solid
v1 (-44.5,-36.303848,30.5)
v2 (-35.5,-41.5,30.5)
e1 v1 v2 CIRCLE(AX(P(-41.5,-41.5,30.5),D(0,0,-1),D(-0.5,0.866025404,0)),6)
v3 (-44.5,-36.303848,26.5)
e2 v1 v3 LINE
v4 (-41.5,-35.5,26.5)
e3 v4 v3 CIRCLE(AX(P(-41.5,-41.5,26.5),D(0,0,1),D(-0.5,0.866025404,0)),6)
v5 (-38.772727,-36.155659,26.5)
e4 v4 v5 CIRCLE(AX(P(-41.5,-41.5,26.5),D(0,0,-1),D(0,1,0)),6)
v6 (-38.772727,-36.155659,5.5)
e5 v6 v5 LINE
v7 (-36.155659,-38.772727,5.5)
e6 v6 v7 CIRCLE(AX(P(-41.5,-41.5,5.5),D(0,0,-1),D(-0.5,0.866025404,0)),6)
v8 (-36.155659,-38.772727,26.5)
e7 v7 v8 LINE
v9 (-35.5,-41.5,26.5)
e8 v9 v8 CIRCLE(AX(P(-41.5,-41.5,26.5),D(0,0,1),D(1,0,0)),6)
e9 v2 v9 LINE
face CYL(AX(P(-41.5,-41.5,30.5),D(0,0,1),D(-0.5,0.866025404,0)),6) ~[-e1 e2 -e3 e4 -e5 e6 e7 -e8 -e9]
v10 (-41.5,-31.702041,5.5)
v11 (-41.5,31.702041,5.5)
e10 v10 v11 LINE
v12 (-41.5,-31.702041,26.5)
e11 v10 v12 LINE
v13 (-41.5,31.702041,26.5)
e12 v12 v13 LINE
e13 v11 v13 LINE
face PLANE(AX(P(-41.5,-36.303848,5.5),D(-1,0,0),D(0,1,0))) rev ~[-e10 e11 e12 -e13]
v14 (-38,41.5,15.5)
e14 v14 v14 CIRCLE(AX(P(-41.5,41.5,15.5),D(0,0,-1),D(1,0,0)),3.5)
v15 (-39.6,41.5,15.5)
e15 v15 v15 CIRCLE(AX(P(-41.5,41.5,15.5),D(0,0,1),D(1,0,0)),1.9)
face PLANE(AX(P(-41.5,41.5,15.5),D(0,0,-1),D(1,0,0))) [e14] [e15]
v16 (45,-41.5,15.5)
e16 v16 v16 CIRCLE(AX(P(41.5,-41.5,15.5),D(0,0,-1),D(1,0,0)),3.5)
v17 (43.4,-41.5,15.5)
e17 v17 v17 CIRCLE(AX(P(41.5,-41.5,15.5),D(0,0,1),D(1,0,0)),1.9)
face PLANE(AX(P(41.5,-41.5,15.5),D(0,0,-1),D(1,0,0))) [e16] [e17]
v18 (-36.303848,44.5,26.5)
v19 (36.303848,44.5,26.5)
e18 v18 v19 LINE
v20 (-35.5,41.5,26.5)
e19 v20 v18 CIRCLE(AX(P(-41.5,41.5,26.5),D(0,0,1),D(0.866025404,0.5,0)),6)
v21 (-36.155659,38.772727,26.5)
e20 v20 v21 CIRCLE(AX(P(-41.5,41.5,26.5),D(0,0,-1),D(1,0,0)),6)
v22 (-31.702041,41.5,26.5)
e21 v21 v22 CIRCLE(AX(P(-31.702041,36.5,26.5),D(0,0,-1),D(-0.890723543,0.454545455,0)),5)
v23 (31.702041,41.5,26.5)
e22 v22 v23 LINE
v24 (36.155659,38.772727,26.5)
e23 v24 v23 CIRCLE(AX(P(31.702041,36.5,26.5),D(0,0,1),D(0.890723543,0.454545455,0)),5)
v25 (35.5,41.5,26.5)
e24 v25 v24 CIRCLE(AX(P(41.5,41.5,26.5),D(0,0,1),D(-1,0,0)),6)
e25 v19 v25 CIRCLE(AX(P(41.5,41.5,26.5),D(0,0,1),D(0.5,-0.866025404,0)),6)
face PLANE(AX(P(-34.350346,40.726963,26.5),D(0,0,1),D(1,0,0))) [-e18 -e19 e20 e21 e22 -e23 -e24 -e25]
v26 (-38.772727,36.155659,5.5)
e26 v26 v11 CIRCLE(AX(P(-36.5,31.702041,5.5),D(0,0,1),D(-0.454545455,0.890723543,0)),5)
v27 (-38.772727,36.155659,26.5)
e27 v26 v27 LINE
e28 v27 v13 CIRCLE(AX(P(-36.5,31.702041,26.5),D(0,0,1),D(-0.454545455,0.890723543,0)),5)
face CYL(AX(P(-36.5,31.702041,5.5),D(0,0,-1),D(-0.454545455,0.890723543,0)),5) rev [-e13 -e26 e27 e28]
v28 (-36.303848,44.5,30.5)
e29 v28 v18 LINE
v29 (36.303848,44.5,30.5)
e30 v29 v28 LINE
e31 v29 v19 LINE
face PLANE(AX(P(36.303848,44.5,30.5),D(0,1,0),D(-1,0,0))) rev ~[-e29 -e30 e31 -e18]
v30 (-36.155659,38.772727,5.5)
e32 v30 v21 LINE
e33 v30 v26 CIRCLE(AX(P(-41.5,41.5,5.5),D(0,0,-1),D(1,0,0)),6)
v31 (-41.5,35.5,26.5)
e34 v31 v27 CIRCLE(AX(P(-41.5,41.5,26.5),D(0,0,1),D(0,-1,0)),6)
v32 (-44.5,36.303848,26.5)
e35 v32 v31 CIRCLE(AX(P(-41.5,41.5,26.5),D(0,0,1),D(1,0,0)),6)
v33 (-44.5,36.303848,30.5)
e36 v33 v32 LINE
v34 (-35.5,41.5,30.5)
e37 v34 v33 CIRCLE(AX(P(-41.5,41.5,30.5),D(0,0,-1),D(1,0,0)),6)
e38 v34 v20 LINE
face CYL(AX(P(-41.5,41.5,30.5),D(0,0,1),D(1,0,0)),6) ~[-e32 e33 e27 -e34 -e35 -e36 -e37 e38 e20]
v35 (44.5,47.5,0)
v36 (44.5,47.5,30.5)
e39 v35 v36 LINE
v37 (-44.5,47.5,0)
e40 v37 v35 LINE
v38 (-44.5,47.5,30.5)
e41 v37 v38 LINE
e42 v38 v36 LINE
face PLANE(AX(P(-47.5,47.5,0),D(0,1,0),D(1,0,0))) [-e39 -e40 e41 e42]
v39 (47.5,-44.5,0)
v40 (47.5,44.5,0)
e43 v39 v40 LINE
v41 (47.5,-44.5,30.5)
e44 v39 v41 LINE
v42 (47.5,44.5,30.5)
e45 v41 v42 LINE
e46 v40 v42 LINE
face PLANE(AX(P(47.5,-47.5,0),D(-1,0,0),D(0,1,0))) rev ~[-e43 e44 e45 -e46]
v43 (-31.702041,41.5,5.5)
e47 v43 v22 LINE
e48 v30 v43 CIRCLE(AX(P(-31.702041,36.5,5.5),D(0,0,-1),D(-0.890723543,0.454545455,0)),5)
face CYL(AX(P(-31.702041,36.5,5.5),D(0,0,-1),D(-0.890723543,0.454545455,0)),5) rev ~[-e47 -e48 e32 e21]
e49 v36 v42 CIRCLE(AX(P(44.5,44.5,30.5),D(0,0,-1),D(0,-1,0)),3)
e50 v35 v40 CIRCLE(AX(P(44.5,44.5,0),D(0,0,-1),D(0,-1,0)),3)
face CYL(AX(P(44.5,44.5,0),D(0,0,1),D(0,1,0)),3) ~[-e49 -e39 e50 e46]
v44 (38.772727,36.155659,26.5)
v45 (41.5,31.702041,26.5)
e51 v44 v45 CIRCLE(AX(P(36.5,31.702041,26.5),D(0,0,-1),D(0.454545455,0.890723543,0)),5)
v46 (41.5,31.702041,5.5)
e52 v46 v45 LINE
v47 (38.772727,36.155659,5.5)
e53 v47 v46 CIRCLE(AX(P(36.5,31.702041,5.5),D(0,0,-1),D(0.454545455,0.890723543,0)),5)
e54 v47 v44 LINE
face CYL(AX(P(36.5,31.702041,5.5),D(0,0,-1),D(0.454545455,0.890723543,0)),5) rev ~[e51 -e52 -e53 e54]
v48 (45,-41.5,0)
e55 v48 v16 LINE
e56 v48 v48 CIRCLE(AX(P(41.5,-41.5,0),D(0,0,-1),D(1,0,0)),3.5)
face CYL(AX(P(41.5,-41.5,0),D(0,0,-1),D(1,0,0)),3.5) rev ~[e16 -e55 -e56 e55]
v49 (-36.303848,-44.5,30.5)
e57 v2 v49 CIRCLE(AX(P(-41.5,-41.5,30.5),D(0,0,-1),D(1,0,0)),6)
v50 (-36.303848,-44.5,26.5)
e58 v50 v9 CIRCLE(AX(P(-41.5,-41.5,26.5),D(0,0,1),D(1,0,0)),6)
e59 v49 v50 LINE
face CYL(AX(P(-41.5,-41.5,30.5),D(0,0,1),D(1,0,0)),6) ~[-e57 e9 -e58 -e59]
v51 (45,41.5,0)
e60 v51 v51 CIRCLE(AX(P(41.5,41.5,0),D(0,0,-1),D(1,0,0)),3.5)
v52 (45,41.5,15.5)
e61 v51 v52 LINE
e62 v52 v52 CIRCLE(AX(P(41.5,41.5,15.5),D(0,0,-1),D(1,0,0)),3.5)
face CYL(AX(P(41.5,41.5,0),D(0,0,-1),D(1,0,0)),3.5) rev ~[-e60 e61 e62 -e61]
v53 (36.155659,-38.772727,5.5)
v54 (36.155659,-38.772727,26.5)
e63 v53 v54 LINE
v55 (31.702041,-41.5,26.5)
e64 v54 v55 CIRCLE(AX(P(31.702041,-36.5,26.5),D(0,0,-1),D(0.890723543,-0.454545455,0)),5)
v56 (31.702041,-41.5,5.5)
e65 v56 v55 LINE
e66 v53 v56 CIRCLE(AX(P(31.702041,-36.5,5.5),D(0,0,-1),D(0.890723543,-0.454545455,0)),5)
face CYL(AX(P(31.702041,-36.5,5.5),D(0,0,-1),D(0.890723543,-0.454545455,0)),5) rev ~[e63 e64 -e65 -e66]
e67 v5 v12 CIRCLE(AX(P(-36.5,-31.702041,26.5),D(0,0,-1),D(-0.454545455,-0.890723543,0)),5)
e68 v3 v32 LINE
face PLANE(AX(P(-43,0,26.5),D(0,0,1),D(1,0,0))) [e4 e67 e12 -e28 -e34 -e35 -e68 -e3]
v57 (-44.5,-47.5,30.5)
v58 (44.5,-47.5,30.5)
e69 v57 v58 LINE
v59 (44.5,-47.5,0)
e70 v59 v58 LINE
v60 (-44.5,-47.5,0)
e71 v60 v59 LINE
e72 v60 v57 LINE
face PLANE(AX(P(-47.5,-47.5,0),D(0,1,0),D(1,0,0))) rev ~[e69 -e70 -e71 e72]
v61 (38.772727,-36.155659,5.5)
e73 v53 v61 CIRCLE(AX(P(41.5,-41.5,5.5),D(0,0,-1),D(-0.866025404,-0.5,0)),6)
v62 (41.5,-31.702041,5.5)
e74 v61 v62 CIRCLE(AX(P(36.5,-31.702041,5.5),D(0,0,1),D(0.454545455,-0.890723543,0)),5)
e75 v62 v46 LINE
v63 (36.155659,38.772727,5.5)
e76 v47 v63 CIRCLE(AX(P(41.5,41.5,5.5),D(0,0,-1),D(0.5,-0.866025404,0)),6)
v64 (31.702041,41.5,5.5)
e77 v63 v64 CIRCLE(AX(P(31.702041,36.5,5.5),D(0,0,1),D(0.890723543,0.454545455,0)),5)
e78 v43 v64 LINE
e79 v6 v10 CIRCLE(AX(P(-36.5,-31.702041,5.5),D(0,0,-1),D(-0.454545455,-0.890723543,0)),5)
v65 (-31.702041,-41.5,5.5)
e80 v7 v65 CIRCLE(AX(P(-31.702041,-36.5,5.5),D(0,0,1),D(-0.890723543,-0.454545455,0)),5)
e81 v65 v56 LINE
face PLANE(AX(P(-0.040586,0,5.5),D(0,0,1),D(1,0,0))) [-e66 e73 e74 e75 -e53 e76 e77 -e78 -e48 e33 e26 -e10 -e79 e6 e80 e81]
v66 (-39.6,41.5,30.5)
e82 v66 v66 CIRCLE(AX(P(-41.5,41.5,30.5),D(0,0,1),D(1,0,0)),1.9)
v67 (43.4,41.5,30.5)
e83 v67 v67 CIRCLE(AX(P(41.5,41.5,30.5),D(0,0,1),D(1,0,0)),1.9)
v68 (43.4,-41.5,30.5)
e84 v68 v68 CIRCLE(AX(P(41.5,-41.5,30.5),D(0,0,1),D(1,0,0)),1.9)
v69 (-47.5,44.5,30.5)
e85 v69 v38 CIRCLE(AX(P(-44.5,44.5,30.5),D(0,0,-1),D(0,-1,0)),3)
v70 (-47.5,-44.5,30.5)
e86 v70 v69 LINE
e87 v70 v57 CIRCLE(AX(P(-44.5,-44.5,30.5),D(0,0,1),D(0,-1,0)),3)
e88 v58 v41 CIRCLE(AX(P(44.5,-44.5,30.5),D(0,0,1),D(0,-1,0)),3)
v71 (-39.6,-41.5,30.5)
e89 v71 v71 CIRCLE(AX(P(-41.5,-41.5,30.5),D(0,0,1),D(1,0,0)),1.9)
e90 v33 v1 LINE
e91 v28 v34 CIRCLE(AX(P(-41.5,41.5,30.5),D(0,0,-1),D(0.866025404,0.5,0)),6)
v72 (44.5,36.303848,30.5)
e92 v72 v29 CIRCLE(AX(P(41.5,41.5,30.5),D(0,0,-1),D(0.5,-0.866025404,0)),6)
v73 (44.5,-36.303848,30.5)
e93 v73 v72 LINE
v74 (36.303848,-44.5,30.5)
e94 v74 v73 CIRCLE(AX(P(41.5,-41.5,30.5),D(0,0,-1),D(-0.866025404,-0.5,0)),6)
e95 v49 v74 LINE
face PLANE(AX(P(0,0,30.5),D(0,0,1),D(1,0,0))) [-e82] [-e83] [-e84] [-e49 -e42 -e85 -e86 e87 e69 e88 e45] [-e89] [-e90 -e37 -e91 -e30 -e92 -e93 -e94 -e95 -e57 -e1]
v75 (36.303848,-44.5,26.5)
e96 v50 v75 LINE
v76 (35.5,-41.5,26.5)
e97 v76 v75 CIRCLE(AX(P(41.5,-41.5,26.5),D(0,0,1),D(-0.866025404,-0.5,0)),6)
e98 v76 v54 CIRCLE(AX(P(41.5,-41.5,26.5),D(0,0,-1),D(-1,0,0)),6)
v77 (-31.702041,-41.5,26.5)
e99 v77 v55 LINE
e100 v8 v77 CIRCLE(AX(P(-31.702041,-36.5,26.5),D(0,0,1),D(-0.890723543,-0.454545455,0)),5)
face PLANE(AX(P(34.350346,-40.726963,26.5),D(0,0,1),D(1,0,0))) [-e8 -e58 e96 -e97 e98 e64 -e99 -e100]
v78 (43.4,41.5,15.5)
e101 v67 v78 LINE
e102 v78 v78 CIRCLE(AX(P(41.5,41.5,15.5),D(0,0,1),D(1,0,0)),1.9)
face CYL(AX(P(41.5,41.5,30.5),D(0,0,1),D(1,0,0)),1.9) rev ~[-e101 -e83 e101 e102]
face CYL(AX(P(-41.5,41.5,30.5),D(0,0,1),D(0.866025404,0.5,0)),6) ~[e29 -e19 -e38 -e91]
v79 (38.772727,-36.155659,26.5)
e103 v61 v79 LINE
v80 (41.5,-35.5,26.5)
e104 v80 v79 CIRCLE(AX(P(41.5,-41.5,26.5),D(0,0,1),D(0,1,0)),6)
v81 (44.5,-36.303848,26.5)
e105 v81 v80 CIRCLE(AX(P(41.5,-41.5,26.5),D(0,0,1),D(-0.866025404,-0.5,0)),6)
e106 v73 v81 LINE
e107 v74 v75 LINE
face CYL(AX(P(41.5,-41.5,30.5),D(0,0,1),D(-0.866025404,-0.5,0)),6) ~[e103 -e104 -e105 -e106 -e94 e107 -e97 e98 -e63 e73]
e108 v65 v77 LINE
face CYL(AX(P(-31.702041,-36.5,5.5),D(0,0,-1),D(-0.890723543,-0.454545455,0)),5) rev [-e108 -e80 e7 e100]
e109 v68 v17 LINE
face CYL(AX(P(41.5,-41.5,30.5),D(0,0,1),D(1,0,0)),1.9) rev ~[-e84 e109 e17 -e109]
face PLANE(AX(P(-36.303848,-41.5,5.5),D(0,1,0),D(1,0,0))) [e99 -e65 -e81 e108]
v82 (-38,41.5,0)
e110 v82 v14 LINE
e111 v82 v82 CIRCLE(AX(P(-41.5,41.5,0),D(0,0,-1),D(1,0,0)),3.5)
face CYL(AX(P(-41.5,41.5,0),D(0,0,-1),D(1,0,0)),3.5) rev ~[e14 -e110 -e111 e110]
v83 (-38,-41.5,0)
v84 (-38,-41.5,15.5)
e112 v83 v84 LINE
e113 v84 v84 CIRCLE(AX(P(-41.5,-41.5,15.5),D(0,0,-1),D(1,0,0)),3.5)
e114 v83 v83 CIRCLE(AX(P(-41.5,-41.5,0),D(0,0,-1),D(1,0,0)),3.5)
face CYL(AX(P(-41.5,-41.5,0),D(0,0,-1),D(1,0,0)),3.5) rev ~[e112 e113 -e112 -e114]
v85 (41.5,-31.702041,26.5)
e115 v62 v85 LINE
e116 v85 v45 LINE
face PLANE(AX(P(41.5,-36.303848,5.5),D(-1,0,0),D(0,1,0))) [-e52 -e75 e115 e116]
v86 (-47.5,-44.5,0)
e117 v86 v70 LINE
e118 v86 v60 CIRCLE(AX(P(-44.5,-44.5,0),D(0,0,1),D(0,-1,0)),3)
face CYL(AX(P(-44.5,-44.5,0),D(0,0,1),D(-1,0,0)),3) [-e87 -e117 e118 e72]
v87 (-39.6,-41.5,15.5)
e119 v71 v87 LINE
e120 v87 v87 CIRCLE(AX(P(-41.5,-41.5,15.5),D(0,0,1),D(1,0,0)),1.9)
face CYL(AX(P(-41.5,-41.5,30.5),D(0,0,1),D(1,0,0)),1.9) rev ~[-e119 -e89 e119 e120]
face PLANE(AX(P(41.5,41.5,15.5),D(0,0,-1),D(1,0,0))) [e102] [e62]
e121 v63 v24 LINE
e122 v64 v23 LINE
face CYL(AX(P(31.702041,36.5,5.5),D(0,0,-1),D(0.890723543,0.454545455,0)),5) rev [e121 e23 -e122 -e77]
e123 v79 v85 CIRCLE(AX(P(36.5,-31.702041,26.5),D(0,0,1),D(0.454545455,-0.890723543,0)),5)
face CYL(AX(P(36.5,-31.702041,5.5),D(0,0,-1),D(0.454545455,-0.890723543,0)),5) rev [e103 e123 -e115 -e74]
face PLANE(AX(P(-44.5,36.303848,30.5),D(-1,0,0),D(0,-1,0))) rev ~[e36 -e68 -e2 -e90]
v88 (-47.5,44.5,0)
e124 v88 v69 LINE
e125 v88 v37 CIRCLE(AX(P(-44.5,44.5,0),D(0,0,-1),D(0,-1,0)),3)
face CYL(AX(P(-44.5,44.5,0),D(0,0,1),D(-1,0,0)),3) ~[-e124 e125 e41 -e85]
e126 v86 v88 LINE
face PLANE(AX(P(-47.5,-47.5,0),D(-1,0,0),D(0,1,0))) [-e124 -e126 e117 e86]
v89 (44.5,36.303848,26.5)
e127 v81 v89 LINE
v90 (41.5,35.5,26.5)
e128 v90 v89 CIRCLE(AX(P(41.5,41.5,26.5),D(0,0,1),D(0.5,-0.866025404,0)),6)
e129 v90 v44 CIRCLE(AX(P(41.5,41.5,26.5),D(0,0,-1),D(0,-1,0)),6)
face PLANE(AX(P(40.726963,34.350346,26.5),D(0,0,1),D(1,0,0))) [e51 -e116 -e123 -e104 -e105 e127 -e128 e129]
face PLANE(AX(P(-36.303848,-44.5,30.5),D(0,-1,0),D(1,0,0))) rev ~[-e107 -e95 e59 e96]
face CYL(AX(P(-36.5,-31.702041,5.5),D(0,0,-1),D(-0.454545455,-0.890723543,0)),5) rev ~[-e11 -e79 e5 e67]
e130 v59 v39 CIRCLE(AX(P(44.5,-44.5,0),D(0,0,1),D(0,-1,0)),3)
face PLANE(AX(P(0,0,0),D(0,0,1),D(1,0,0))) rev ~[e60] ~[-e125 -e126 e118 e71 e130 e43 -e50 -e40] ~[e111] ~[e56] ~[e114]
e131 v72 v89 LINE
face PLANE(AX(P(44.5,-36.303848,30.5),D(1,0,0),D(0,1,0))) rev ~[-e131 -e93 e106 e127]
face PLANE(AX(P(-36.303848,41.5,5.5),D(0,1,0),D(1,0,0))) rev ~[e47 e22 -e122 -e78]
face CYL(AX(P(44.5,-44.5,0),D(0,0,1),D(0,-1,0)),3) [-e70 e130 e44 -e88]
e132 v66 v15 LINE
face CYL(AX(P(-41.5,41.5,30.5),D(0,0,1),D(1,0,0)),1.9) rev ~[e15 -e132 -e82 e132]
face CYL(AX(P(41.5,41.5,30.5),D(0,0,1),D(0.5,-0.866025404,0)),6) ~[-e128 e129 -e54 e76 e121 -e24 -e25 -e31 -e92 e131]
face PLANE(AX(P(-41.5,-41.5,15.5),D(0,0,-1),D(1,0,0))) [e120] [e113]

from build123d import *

# Parameters (mm, degrees)
F0_W        = 95
F0_H        = 95
F1_DEPTH    = 30.5
F3_DEPTH    = 25
F4_R        = 1.9
F5_DEPTH    = 30.501
F6_R        = 3
F7_W        = 72.6076951546
F7_H        = 3
F7_W_2      = 3
F7_H_2      = 72.6076951546
F8_DEPTH    = 21
F9_T1_DEPTH = 21
F10_R       = 3.5
F11_DEPTH   = 15.5


# Not quite as in the source:
# - a fillet or chamfer that OpenCascade refuses, or shapes differently, is made with other operations: its cross-section is extruded or revolved along the edge and cut away or added


with BuildPart() as f1:
    # F0 (on Top) → F1 (new body)
    with BuildSketch(Plane.XY):
        Rectangle(F0_W, F0_H)
    extrude(amount=F1_DEPTH)

    # F2 (on face) → F3 (cut)
    with BuildSketch(Plane.XY.offset(30.5)):
        with BuildLine():
            Line((36.3038475773, 44.5), (-36.3038475773, 44.5))
            ThreePointArc((-36.3038475773, 44.5), (-35.7044450423, 43.0529142706), (-35.5, 41.5))
            ThreePointArc((-35.5, 41.5), (-38.5, 36.3038475773), (-44.5, 36.3038475773))
            Line((-44.5, 36.3038475773), (-44.5, -36.3038475773))
            ThreePointArc((-44.5, -36.3038475773), (-38.5, -36.3038475773), (-35.5, -41.5))
            ThreePointArc((-35.5, -41.5), (-35.7044450423, -43.0529142706), (-36.3038475773, -44.5))
            Line((-36.3038475773, -44.5), (36.3038475773, -44.5))
            ThreePointArc((36.3038475773, -44.5), (37.2573593129, -37.2573593129), (44.5, -36.3038475773))
            Line((44.5, -36.3038475773), (44.5, 36.3038475773))
            ThreePointArc((44.5, 36.3038475773), (37.2573593129, 37.2573593129), (36.3038475773, 44.5))
        make_face()
    extrude(amount=-F3_DEPTH, mode=Mode.SUBTRACT)

    # F4 (on face) → F5 (cut, through all)
    with BuildSketch(Plane.XY.offset(30.5)):
        with Locations((-41.5, 41.5)):
            Circle(F4_R)
        with Locations((41.5, 41.5)):
            Circle(F4_R)
        with Locations((-41.5, -41.5)):
            Circle(F4_R)
        with Locations((41.5, -41.5)):
            Circle(F4_R)
    extrude(amount=-F5_DEPTH, mode=Mode.SUBTRACT)

    # F6
    f6_edges = [f1.edges().sort_by_distance(p)[0] for p in [
        (-47.5, 47.5, 15.25),
        (47.5, 47.5, 15.25),
        (-47.5, -47.5, 15.25),
        (47.5, -47.5, 15.25),
    ]]
    fillet(f6_edges, radius=F6_R)

    # F7 (on face) → F8 (join)
    with BuildSketch(Plane.XY.offset(5.5)):
        with Locations((0, 43)):
            Rectangle(F7_W, F7_H)
        with Locations((-43, 0)):
            Rectangle(F7_W_2, F7_H_2)
        with Locations((0, -43)):
            Rectangle(F7_W, F7_H)
        with Locations((43, 0)):
            Rectangle(F7_W_2, F7_H_2)
    extrude(amount=F8_DEPTH)

    # F9: fillet of radius 5 on 8 edges, made by hand

    # F9_s2 → F9_t1 (join)
    with BuildSketch(Plane.XY.offset(5.5)):
        with BuildLine():
            ThreePointArc((-36.155658743, 38.7727272727), (-34.3132058682, 40.7640143271), (-31.7020410289, 41.5))
            Line((-31.7020410289, 41.5), (-35.5, 41.5))
            ThreePointArc((-35.5, 41.5), (-35.6662170274, 40.0975107027), (-36.155658743, 38.7727272727))
        make_face()
        with BuildLine():
            ThreePointArc((-38.7727272727, 36.155658743), (-40.7640143271, 34.3132058682), (-41.5, 31.7020410289))
            Line((-41.5, 31.7020410289), (-41.5, 35.5))
            ThreePointArc((-41.5, 35.5), (-40.0975107027, 35.6662170274), (-38.7727272727, 36.155658743))
        make_face()
        with BuildLine():
            ThreePointArc((36.155658743, 38.7727272727), (34.3132058682, 40.7640143271), (31.7020410289, 41.5))
            Line((31.7020410289, 41.5), (35.5, 41.5))
            ThreePointArc((35.5, 41.5), (35.6662170274, 40.0975107027), (36.155658743, 38.7727272727))
        make_face()
        with BuildLine():
            ThreePointArc((38.7727272727, 36.155658743), (40.7640143271, 34.3132058682), (41.5, 31.7020410289))
            Line((41.5, 31.7020410289), (41.5, 35.5))
            ThreePointArc((41.5, 35.5), (40.0975107027, 35.6662170274), (38.7727272727, 36.155658743))
        make_face()
        with BuildLine():
            ThreePointArc((38.7727272727, -36.155658743), (40.7640143271, -34.3132058682), (41.5, -31.7020410289))
            Line((41.5, -31.7020410289), (41.5, -35.5))
            ThreePointArc((41.5, -35.5), (40.0975107027, -35.6662170274), (38.7727272727, -36.155658743))
        make_face()
        with BuildLine():
            ThreePointArc((36.155658743, -38.7727272727), (34.3132058682, -40.7640143271), (31.7020410289, -41.5))
            Line((31.7020410289, -41.5), (35.5, -41.5))
            ThreePointArc((35.5, -41.5), (35.6662170274, -40.0975107027), (36.155658743, -38.7727272727))
        make_face()
        with BuildLine():
            ThreePointArc((-38.7727272727, -36.155658743), (-40.7640143271, -34.3132058682), (-41.5, -31.7020410289))
            Line((-41.5, -31.7020410289), (-41.5, -35.5))
            ThreePointArc((-41.5, -35.5), (-40.0975107027, -35.6662170274), (-38.7727272727, -36.155658743))
        make_face()
        with BuildLine():
            ThreePointArc((-36.155658743, -38.7727272727), (-34.3132058682, -40.7640143271), (-31.7020410289, -41.5))
            Line((-31.7020410289, -41.5), (-35.5, -41.5))
            ThreePointArc((-35.5, -41.5), (-35.6662170274, -40.0975107027), (-36.155658743, -38.7727272727))
        make_face()
    extrude(amount=F9_T1_DEPTH)

    # F10 (on face) → F11 (cut)
    with BuildSketch(Plane(origin=(0, 0, 0), x_dir=(1, 0, 0), z_dir=(0, 0, -1))):
        with Locations((-41.5, 41.5)):
            Circle(F10_R)
        with Locations((41.5, 41.5)):
            Circle(F10_R)
        with Locations((-41.5, -41.5)):
            Circle(F10_R)
        with Locations((41.5, -41.5)):
            Circle(F10_R)
    extrude(amount=-F11_DEPTH, mode=Mode.SUBTRACT)


solid = f1.part
